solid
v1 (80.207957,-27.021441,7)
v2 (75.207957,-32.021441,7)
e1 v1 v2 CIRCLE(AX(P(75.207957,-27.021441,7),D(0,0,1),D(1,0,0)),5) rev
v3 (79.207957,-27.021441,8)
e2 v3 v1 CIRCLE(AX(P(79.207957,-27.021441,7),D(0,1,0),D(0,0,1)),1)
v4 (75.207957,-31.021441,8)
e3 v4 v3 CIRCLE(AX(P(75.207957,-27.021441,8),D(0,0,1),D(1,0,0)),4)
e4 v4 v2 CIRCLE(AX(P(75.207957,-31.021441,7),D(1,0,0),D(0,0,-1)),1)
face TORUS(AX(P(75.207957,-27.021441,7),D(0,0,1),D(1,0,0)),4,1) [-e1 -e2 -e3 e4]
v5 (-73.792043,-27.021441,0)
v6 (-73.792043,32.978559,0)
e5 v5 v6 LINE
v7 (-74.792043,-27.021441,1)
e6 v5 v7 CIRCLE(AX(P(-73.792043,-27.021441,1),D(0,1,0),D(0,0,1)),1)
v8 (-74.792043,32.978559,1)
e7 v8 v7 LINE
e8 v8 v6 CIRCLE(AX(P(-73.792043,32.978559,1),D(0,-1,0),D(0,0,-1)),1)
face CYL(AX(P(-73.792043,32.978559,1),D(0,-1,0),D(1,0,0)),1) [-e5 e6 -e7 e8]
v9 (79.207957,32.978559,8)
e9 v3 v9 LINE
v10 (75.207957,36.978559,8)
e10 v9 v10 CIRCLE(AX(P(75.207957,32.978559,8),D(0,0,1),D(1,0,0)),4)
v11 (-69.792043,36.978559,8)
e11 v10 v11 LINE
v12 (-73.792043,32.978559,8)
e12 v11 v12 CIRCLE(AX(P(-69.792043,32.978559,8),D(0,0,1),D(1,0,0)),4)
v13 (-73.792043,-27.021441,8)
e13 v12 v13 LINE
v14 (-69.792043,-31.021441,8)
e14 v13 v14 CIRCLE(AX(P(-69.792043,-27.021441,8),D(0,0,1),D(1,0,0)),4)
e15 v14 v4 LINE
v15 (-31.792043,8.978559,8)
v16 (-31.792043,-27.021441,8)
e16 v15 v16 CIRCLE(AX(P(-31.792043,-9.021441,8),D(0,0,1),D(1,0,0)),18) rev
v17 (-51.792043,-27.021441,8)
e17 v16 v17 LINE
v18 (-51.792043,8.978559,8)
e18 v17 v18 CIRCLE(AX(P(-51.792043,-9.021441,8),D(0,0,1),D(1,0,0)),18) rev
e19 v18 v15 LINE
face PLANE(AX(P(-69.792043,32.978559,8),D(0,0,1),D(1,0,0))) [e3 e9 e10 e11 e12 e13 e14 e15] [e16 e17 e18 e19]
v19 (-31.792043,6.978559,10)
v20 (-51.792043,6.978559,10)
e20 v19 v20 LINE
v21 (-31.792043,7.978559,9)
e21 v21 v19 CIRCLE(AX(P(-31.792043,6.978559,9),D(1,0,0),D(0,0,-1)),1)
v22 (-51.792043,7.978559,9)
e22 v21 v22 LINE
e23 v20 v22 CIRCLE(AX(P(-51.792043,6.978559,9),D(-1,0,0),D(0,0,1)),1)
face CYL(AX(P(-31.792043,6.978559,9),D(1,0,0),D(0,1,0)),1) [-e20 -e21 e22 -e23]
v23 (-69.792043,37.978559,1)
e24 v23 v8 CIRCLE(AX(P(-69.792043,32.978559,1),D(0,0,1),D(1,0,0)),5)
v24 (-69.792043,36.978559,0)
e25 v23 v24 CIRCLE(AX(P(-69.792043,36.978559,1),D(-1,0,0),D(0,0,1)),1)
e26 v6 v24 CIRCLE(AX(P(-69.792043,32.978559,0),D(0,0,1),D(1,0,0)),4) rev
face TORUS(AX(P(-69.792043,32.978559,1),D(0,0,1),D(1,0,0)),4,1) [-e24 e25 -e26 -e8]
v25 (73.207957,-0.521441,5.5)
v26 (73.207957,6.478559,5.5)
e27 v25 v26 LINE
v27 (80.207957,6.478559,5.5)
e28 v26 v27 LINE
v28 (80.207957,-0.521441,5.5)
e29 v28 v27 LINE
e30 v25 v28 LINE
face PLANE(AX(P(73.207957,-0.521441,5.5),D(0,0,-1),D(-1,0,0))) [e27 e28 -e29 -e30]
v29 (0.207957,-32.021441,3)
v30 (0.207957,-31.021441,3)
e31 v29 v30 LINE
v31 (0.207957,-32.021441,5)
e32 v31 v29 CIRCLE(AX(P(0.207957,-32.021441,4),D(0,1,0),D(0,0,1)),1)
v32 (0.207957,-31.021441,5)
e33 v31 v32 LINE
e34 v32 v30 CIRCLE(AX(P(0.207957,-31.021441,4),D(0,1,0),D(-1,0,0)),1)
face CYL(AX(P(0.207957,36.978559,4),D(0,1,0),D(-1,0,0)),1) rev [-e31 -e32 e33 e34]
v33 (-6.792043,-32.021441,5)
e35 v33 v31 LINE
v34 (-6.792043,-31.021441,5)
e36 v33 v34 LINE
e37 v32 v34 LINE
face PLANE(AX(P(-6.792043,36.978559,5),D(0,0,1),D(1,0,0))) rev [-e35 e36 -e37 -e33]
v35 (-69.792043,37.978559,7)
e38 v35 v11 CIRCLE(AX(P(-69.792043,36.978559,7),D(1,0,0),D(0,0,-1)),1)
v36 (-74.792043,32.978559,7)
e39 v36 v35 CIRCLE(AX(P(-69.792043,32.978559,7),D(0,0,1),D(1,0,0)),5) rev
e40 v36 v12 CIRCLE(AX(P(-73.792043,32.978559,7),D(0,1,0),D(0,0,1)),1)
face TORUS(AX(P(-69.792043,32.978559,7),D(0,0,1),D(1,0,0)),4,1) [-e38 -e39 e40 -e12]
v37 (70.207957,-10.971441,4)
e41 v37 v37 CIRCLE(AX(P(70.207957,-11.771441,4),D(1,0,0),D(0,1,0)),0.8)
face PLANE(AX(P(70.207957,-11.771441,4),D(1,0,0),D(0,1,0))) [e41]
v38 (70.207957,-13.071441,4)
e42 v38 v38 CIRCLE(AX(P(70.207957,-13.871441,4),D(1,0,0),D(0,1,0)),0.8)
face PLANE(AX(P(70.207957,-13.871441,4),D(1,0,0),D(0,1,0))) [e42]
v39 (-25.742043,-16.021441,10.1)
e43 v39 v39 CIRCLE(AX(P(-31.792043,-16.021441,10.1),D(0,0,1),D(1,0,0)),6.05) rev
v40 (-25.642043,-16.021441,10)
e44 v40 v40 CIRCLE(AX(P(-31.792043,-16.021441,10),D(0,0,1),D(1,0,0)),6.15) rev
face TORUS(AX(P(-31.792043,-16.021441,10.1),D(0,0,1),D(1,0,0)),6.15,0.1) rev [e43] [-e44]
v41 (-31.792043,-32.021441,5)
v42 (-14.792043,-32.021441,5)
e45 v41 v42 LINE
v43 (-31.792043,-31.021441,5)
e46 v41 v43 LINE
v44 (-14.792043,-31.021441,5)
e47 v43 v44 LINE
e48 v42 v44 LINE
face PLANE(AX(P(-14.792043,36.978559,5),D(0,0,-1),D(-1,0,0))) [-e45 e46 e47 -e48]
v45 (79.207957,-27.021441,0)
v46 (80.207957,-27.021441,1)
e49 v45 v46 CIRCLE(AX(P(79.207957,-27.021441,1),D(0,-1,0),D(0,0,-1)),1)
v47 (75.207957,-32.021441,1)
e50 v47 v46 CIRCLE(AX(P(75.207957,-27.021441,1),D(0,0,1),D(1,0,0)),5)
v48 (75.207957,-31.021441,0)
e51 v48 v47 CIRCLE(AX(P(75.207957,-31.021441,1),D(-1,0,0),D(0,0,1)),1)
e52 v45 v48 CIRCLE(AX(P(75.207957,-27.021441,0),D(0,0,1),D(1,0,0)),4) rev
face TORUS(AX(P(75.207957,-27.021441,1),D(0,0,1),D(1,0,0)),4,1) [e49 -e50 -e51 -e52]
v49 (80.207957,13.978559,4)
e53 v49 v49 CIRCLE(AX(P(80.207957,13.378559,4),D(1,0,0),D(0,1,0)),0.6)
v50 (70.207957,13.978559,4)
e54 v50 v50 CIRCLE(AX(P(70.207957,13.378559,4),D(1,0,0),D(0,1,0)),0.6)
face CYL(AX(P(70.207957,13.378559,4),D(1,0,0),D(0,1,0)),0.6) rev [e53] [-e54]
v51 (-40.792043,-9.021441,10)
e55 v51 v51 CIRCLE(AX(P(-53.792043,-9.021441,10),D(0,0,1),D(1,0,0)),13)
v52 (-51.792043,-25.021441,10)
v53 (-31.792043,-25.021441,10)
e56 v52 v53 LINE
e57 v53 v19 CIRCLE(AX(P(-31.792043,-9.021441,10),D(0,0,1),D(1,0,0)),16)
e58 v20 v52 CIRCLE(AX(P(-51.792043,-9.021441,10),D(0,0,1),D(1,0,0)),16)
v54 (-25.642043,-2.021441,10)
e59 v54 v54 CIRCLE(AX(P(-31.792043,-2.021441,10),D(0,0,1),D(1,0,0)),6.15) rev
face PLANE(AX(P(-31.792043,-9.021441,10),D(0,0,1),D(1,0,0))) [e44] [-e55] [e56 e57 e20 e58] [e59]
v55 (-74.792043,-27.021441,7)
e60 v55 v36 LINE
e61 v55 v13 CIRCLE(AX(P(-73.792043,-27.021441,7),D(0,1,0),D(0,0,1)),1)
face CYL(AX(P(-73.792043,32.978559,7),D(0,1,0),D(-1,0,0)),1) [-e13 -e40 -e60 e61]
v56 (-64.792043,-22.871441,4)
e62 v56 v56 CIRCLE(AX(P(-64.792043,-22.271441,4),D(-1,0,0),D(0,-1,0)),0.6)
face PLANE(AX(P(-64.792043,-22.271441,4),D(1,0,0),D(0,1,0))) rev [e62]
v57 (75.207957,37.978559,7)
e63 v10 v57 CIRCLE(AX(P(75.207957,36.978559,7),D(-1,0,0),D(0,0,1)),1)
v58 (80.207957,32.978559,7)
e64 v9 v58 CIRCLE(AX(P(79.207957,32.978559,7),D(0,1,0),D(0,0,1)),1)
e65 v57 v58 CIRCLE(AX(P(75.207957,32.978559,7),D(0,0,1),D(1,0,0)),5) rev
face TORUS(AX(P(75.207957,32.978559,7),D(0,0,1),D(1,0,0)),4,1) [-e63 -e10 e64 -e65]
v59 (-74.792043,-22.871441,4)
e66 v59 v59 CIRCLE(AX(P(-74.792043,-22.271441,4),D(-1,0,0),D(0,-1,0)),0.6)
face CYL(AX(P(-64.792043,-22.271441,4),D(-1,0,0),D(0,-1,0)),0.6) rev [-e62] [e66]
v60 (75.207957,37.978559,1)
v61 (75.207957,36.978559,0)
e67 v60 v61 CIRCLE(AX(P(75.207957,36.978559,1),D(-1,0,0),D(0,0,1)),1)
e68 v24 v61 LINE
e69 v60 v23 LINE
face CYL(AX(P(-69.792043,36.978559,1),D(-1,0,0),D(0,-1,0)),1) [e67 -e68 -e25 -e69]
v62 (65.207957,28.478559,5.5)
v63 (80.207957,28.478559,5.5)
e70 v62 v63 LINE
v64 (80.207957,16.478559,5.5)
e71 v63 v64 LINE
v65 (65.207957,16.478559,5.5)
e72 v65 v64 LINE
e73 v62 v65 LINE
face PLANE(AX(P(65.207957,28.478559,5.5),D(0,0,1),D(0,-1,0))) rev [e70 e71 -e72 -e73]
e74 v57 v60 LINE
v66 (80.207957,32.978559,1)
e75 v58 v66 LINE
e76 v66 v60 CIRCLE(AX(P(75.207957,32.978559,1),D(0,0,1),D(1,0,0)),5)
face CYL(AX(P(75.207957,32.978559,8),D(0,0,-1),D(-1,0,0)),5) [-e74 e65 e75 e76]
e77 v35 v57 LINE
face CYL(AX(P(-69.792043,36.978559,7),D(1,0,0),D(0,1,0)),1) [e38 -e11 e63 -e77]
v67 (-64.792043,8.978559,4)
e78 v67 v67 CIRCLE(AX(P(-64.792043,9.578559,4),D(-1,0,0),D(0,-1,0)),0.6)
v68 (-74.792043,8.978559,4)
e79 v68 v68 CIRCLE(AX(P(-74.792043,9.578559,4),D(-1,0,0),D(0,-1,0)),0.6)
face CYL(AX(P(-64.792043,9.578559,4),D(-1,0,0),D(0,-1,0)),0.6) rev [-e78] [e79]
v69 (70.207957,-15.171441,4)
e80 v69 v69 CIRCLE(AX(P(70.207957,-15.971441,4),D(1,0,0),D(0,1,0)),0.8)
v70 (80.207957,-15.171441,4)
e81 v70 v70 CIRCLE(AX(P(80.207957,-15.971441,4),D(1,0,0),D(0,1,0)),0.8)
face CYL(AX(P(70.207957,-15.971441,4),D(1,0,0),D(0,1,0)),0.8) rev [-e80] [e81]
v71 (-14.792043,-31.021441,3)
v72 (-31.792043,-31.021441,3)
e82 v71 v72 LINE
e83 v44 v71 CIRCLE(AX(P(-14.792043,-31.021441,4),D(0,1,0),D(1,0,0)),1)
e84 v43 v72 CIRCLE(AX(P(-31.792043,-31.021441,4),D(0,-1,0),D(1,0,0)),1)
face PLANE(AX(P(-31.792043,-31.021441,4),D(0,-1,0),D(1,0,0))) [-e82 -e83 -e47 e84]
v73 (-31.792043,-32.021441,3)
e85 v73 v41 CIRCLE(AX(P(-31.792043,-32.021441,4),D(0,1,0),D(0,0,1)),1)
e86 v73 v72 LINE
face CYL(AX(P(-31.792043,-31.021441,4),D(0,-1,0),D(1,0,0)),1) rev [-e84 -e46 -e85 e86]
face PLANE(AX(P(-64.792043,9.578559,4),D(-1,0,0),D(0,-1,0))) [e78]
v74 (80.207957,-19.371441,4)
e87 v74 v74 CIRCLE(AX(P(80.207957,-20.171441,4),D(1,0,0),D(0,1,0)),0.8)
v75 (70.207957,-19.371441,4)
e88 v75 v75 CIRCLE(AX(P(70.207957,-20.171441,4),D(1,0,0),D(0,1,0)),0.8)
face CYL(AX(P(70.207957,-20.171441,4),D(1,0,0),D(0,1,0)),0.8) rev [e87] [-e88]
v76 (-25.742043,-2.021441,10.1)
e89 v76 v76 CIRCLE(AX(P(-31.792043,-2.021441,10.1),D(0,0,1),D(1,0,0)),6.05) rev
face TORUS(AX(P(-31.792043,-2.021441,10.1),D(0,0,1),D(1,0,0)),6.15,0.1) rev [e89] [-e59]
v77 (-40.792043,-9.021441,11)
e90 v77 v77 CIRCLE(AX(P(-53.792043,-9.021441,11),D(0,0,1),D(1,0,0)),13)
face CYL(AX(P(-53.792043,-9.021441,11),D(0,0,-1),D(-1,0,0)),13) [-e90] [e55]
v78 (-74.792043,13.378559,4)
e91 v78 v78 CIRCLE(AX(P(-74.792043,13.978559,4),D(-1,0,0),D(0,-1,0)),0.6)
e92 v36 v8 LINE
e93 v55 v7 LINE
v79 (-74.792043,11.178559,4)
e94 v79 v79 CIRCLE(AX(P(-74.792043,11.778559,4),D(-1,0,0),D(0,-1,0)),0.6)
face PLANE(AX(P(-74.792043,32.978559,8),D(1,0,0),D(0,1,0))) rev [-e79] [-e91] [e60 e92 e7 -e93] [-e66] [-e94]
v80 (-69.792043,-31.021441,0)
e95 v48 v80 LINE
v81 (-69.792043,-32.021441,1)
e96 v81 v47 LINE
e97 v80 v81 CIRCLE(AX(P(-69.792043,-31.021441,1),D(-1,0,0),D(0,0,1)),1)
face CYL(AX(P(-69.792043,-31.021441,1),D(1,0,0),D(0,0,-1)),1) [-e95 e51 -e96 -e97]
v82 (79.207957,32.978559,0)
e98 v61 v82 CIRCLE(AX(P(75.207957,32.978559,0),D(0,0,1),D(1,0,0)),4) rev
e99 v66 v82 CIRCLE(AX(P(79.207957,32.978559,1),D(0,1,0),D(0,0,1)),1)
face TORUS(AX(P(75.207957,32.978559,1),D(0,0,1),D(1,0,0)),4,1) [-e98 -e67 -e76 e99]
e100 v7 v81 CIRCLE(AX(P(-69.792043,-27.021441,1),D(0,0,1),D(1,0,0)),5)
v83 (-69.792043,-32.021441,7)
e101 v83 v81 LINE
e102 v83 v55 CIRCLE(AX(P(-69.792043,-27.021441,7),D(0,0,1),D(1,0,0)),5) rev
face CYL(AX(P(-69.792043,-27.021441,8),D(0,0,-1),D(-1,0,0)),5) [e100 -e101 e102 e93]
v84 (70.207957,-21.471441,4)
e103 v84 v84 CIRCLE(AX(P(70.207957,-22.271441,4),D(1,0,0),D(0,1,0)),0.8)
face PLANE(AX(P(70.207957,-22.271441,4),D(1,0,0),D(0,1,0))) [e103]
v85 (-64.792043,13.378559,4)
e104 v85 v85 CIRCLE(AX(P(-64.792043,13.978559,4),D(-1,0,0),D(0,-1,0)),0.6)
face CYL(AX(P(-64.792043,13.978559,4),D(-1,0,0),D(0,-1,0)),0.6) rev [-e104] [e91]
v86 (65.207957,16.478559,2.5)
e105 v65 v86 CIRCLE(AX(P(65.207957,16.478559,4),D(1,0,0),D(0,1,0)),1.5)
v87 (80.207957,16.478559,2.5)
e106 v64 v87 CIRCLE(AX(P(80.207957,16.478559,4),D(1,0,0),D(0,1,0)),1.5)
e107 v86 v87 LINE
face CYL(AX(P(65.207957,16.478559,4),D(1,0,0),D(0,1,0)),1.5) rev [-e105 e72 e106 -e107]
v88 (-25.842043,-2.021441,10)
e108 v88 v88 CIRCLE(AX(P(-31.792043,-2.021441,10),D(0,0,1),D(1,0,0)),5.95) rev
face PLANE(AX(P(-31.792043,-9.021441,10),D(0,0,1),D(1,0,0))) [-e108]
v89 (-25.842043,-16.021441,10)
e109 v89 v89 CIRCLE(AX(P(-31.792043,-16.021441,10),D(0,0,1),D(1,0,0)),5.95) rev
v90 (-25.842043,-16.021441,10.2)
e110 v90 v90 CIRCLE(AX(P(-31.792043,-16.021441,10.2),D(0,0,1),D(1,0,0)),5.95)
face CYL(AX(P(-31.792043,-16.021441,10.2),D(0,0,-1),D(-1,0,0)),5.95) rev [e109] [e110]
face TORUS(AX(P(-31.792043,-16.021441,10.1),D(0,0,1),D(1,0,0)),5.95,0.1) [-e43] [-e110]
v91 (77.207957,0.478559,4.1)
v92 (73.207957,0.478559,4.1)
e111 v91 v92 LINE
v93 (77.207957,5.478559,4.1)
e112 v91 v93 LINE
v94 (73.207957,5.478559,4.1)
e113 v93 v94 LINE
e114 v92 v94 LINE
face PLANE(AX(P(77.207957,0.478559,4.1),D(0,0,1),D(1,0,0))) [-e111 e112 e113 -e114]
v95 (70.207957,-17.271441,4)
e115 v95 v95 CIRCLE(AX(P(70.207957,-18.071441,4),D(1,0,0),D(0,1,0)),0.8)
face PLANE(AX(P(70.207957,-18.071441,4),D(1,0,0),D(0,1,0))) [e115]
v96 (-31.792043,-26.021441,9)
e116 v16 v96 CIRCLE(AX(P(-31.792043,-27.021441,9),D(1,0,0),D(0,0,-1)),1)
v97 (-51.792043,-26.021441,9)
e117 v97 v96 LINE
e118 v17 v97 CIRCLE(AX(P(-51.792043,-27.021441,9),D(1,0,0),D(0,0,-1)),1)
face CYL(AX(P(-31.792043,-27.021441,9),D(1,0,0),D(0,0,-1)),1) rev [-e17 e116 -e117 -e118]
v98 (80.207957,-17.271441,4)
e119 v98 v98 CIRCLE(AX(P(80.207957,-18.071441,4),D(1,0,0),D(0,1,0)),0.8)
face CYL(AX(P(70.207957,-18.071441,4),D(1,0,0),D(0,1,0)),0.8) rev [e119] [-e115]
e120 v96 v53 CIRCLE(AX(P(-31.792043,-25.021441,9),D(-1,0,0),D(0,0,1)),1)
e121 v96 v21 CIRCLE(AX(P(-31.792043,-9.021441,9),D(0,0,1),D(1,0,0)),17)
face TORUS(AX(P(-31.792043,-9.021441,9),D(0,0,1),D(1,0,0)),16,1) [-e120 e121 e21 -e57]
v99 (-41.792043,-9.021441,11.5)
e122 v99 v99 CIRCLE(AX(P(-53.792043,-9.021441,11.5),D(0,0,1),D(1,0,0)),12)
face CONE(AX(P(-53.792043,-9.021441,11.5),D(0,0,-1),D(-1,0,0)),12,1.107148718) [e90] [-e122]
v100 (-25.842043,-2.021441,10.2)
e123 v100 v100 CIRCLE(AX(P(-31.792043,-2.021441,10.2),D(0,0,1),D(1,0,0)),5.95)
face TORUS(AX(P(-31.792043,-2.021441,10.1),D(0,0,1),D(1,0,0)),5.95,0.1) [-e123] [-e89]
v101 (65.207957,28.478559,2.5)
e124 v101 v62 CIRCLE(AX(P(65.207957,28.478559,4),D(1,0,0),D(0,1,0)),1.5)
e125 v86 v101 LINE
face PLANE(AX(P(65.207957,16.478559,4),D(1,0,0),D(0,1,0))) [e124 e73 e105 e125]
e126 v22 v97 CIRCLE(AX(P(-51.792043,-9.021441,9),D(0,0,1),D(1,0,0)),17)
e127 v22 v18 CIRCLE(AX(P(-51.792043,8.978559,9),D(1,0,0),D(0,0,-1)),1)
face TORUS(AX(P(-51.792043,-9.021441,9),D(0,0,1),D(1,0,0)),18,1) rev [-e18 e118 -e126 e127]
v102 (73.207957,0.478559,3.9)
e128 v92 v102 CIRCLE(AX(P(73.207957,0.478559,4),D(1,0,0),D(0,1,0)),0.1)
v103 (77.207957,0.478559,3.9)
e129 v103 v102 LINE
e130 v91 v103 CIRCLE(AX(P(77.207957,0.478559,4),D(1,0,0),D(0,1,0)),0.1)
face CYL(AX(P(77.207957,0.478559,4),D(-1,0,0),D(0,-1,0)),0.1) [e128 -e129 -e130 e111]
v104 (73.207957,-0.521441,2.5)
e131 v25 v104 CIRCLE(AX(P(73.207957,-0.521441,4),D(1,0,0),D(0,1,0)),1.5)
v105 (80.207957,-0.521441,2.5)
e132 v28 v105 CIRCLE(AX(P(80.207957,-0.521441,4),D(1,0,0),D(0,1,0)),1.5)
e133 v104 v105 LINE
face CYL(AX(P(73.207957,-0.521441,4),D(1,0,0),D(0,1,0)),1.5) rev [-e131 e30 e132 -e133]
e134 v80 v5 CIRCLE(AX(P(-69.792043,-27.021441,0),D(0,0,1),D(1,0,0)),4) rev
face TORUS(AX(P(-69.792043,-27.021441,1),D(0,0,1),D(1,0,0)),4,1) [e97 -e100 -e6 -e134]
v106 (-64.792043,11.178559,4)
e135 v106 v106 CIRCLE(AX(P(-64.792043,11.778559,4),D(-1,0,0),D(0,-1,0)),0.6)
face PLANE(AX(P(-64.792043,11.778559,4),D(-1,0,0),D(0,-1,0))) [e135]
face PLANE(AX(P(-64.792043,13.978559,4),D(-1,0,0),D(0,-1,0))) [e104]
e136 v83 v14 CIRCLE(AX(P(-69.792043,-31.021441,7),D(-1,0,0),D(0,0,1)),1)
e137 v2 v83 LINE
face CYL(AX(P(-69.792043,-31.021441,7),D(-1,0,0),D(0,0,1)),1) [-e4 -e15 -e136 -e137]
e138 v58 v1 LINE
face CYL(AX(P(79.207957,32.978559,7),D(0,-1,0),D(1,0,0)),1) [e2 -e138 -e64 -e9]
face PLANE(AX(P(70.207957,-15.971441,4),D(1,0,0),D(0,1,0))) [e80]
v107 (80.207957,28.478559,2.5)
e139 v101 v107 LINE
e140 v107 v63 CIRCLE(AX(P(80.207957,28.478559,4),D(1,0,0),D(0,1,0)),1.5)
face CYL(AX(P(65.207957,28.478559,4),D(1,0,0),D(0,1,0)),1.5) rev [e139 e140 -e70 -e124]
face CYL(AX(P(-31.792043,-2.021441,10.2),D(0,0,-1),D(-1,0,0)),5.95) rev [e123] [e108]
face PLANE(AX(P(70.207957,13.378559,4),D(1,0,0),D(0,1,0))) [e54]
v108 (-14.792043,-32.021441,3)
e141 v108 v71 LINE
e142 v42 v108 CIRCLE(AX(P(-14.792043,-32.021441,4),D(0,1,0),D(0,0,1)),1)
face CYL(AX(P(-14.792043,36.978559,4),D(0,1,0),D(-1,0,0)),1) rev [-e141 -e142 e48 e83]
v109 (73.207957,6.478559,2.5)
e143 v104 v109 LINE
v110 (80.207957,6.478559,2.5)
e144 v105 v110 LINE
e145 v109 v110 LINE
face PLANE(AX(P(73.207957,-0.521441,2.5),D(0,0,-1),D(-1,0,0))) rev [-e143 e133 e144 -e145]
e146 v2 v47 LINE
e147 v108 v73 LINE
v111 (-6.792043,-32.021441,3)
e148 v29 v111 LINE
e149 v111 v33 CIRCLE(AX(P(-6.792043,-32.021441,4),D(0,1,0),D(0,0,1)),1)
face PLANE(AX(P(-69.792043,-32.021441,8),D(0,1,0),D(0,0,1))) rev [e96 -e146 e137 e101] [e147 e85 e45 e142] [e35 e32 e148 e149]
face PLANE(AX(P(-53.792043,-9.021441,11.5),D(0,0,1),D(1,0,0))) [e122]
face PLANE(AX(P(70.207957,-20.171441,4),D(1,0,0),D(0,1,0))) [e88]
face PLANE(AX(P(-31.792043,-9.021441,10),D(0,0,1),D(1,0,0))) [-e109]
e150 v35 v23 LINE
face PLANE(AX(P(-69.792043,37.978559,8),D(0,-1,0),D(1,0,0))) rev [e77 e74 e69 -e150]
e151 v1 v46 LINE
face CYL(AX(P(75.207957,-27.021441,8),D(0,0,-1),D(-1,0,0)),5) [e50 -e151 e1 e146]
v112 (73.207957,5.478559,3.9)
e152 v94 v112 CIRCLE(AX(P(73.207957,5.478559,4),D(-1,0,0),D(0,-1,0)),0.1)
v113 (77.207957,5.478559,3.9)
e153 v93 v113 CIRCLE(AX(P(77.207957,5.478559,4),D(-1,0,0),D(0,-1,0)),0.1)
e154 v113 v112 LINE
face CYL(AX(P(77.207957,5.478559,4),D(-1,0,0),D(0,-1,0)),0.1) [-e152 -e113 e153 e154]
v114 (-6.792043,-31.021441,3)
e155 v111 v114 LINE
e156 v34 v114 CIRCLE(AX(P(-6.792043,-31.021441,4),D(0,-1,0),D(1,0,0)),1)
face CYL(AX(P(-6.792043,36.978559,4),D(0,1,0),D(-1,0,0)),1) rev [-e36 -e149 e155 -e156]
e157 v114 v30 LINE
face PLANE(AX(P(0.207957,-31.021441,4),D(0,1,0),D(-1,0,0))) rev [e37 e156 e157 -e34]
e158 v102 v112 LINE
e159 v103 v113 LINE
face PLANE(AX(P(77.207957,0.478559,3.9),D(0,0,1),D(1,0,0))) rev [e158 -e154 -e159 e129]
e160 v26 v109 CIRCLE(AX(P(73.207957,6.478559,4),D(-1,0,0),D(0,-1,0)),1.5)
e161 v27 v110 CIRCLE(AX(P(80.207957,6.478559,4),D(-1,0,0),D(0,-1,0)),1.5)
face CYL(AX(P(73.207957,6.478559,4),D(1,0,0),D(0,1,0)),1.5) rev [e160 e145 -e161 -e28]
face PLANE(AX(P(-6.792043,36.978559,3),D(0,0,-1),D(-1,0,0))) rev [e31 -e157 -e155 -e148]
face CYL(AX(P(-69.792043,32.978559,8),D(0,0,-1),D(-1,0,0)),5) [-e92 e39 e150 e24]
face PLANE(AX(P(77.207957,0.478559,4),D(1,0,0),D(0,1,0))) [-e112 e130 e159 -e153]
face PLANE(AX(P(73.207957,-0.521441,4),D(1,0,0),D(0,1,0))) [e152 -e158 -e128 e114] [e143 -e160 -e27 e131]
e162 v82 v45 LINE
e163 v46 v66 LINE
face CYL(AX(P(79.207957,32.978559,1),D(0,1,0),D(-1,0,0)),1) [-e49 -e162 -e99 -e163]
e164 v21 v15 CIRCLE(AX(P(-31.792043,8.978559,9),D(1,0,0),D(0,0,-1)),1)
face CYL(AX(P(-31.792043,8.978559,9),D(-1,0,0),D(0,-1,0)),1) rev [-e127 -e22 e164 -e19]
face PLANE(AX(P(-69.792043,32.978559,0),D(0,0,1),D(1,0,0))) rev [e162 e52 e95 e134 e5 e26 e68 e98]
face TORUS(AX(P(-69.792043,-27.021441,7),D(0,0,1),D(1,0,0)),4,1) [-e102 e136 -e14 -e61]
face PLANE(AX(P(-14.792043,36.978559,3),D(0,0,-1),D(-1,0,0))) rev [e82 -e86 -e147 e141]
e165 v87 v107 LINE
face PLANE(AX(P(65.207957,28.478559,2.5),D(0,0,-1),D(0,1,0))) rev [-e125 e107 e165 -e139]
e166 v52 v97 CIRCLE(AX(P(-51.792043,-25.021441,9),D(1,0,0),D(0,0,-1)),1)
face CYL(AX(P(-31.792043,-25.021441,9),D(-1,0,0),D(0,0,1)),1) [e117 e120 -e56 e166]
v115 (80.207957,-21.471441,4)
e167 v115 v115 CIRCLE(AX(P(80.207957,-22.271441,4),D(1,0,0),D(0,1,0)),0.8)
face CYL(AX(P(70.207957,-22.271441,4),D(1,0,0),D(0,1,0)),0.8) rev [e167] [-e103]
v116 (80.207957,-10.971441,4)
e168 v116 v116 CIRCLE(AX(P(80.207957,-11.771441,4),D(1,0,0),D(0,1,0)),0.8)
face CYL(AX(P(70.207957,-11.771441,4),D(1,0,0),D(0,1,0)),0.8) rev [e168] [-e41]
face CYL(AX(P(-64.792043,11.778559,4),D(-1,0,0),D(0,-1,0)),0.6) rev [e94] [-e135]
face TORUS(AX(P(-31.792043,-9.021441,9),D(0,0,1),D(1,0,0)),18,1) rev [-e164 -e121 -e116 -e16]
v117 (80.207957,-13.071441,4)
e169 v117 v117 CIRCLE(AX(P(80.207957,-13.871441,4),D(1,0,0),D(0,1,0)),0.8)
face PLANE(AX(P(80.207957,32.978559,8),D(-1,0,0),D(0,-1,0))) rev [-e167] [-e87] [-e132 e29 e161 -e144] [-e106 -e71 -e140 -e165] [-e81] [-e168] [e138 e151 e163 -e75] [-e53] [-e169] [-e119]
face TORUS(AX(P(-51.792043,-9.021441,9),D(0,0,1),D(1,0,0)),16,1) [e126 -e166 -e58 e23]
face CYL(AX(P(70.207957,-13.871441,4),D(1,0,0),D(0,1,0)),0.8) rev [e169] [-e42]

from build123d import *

# Parameters (mm, degrees)
EXTRUDE_1_DEPTH      = 8
FILLET_1_R           = 1
FILLET_2_R           = 1
CUT_EXTRUDE_2_DEPTH  = 7
EXTRUDE_3_DEPTH      = 4
CUT_EXTRUDE_3_DEPTH  = 15
SKETCH_8_R           = 0.6
CUT_EXTRUDE_5_DEPTH  = 10
SKETCH_10_R          = 0.95
CUT_EXTRUDE_6_DEPTH  = 10
SKETCH_11_R          = 0.85
CUT_EXTRUDE_7_DEPTH  = 10
SKETCH_12_R          = 0.95
SKETCH_12_R_2        = 0.9
EXTRUDE_4_DEPTH      = 10
EXTRUDE_START        = 10
SKETCH_13_R          = 0.85
EXTRUDE_5_DEPTH      = 10
SKETCH_14_R          = 0.9
CUT_EXTRUDE_8_DEPTH  = 10
SKETCH_15_R          = 0.9
SKETCH_15_R_2        = 0.8
EXTRUDE_6_DEPTH      = 10
SKETCH_16_R          = 0.9
SKETCH_16_R_2        = 0.8
EXTRUDE_7_DEPTH      = 10
SKETCH_17_R          = 0.8
EXTRUDE_8_DEPTH      = 10
SKETCH_18_R          = 0.8
EXTRUDE_9_DEPTH      = 10
SKETCH_19_R          = 0.8
CUT_EXTRUDE_9_DEPTH  = 10
SKETCH_20_R          = 0.8
CUT_EXTRUDE_10_DEPTH = 10
SKETCH_21_R          = 0.8
CUT_EXTRUDE_11_DEPTH = 10
SKETCH_22_R          = 0.8
CUT_EXTRUDE_12_DEPTH = 10
SKETCH_23_R          = 0.8
CUT_EXTRUDE_13_DEPTH = 10
SKETCH_24_R          = 0.8
CUT_EXTRUDE_14_DEPTH = 10
CUT_EXTRUDE_15_DEPTH = 1
CUT_EXTRUDE_16_DEPTH = 1
CUT_EXTRUDE_17_DEPTH = 128
CUT_EXTRUDE_18_DEPTH = 128
EXTRUDE_10_DEPTH     = 69
EXTRUDE_12_DEPTH     = 69
SKETCH_34_R          = 0.8
CUT_EXTRUDE_19_DEPTH = 190
EXTRUDE_START_2      = -10
SKETCH_37_R          = 0.8
SKETCH_37_R_2        = 0.6
EXTRUDE_13_DEPTH     = 10
EXTRUDE_START_3      = 135
SKETCH_39_R          = 0.8
EXTRUDE_14_DEPTH     = 135
SKETCH_40_R          = 0.6
CUT_EXTRUDE_20_DEPTH = 155
SKETCH_43_R          = 0.6
EXTRUDE_15_DEPTH     = 145
SKETCH_44_R          = 0.6
CUT_EXTRUDE_21_DEPTH = 10
SKETCH_45_R          = 0.6
CUT_EXTRUDE_22_DEPTH = 10
SKETCH_47_R          = 1
EXTRUDE_16_DEPTH     = 10
CUT_EXTRUDE_START    = -10
SKETCH_49_R          = 1
CUT_EXTRUDE_23_DEPTH = 10
SKETCH_50_R          = 1
EXTRUDE_17_DEPTH     = 10
EXTRUDE_18_DEPTH     = 2
FILLET_3_R           = 1
FILLET_4_R           = 1
SKETCH_54_R          = 13
EXTRUDE_19_DEPTH     = 1
SKETCH_55_R          = 12
EXTRUDE_20_DEPTH     = 0.5
SKETCH_56_R          = 1
CUT_EXTRUDE_24_DEPTH = 10
SKETCH_57_R          = 6.05
SKETCH_57_R_2        = 5.95
EXTRUDE_21_DEPTH     = 0.2
FILLET_6_R           = 0.1
SKETCH_58_R          = 6.05
SKETCH_58_R_2        = 5.95
EXTRUDE_22_DEPTH     = 0.2
FILLET_9_R           = 0.1
SKETCH_61_R          = 0.6
EXTRUDE_23_DEPTH     = 10
SKETCH_62_R          = 0.6
EXTRUDE_24_DEPTH     = 10
EXTRUDE_START_4      = -20
SKETCH_65_R          = 0.6
EXTRUDE_28_DEPTH     = 20
SKETCH_67_R          = 0.6
CUT_EXTRUDE_26_DEPTH = 10
SKETCH_68_R          = 0.6
CUT_EXTRUDE_27_DEPTH = 10
SKETCH_69_R          = 0.6
CUT_EXTRUDE_28_DEPTH = 10


with BuildPart() as part:
    # 草图1 → 凸台-拉伸1 (new body)
    with BuildSketch(Plane.XY):
        with BuildLine():
            Line((-74.7920434, 32.978558835), (-74.7920434, -27.021441165))
            ThreePointArc((-74.7920434, -27.021441165), (-73.327577306, -30.556975071), (-69.7920434, -32.021441165))
            Line((-69.7920434, -32.021441165), (75.2079566, -32.021441165))
            ThreePointArc((75.2079566, -32.021441165), (78.743490506, -30.556975071), (80.2079566, -27.021441165))
            Line((80.2079566, -27.021441165), (80.2079566, 32.978558835))
            ThreePointArc((80.2079566, 32.978558835), (78.743490506, 36.514092741), (75.2079566, 37.978558835))
            Line((75.2079566, 37.978558835), (-69.7920434, 37.978558835))
            ThreePointArc((-69.7920434, 37.978558835), (-73.327577306, 36.514092741), (-74.7920434, 32.978558835))
        make_face()
    extrude(amount=EXTRUDE_1_DEPTH)

    # 圆角1
    fillet_1_edges = [part.edges().sort_by_distance(p)[0] for p in [
        (-73.327577306, -30.556975071, 8),
        (2.7079566, -32.021441165, 8),
        (78.743490506, -30.556975071, 8),
        (80.2079566, 2.978558835, 8),
        (78.743490506, 36.514092741, 8),
        (2.7079566, 37.978558835, 8),
        (-73.327577306, 36.514092741, 8),
        (-74.7920434, 2.978558835, 8),
    ]]
    fillet(fillet_1_edges, radius=FILLET_1_R)

    # 圆角2
    fillet_2_edges = [part.edges().sort_by_distance(p)[0] for p in [
        (2.7079566, -32.021441165, 0),
        (-73.327577306, -30.556975071, 0),
        (-74.7920434, 2.978558835, 0),
        (-73.327577306, 36.514092741, 0),
        (2.7079566, 37.978558835, 0),
        (78.743490506, 36.514092741, 0),
        (80.2079566, 2.978558835, 0),
        (78.743490506, -30.556975071, 0),
    ]]
    fillet(fillet_2_edges, radius=FILLET_2_R)

    # 草图3 → 切除-拉伸2 (cut)
    with BuildSketch(Plane(origin=(80.2079566, 0, 0), x_dir=(0, 0, -1), z_dir=(1, 0, 0))):
        with BuildLine():
            Line((-5.5, -0.521441165), (-5.5, 6.478558835))
            ThreePointArc((-5.5, 6.478558835), (-4, 7.978558835), (-2.5, 6.478558835))
            Line((-2.5, 6.478558835), (-2.5, -0.521441165))
            ThreePointArc((-2.5, -0.521441165), (-4, -2.021441165), (-5.5, -0.521441165))
        make_face()
    extrude(amount=-CUT_EXTRUDE_2_DEPTH, mode=Mode.SUBTRACT)

    # 草图6 → 凸台-拉伸3 (add)
    with BuildSketch(Plane(origin=(73.2079566, 0, 0), x_dir=(0, 0, -1), z_dir=(1, 0, 0))):
        with BuildLine():
            Line((-4.1, 0.478558835), (-4.1, 5.478558835))
            ThreePointArc((-4.1, 5.478558835), (-4, 5.578558835), (-3.9, 5.478558835))
            Line((-3.9, 5.478558835), (-3.9, 0.478558835))
            ThreePointArc((-3.9, 0.478558835), (-4, 0.378558835), (-4.1, 0.478558835))
        make_face()
    extrude(amount=EXTRUDE_3_DEPTH)

    # 草图7 → 切除-拉伸3 (cut)
    with BuildSketch(Plane(origin=(80.2079566, 0, 0), x_dir=(0, 0, -1), z_dir=(1, 0, 0))):
        with BuildLine():
            Line((-5.5, 28.478558835), (-5.5, 16.478558835))
            ThreePointArc((-5.5, 16.478558835), (-4, 14.978558835), (-2.5, 16.478558835))
            Line((-2.5, 16.478558835), (-2.5, 28.478558835))
            ThreePointArc((-2.5, 28.478558835), (-4, 29.978558835), (-5.5, 28.478558835))
        make_face()
    extrude(amount=-CUT_EXTRUDE_3_DEPTH, mode=Mode.SUBTRACT)

    # 草图8 → 切除-拉伸5 (cut)
    with BuildSketch(Plane(origin=(80.2079566, 0, 0), x_dir=(0, 0, -1), z_dir=(1, 0, 0))):
        with Locations(Location((-4, 13.378558835, 0), (0, 0, 90))):
            Circle(SKETCH_8_R)
    extrude(amount=-CUT_EXTRUDE_5_DEPTH, mode=Mode.SUBTRACT)

    # 草图10 → 切除-拉伸6 (cut)
    with BuildSketch(Plane(origin=(80.2079566, 0, 0), x_dir=(0, 0, -1), z_dir=(1, 0, 0))):
        with Locations(Location((-4, -11.971441165, 0), (0, 0, 90))):
            Circle(SKETCH_10_R)
    extrude(amount=-CUT_EXTRUDE_6_DEPTH, mode=Mode.SUBTRACT)

    # 草图11 → 切除-拉伸7 (cut)
    with BuildSketch(Plane(origin=(80.2079566, 0, 0), x_dir=(0, 0, -1), z_dir=(1, 0, 0))):
        with Locations(Location((-4, -13.891441165, 0), (0, 0, 90))):
            Circle(SKETCH_11_R)
    extrude(amount=-CUT_EXTRUDE_7_DEPTH, mode=Mode.SUBTRACT)

    # 草图12 → 凸台-拉伸4 (add)
    with BuildSketch(Plane(origin=(80.2079566, 0, 0), x_dir=(0, 0, -1), z_dir=(1, 0, 0))):
        with Locations((-4, -11.971441165)):
            Circle(SKETCH_12_R)
        with Locations(Location((-4, -11.971441165, 0), (0, 0, 90))):
            Circle(SKETCH_12_R_2, mode=Mode.SUBTRACT)
    extrude(amount=-EXTRUDE_4_DEPTH)

    # 草图13 → 凸台-拉伸5 (add)
    with BuildSketch(Plane(origin=(70.2079566, 0, 0), x_dir=(0, 0, -1), z_dir=(1, 0, 0)).offset(EXTRUDE_START)):
        with Locations((-4, -13.891441165)):
            Circle(SKETCH_13_R)
    extrude(amount=-EXTRUDE_5_DEPTH)

    # 草图14 → 切除-拉伸8 (cut)
    with BuildSketch(Plane(origin=(80.2079566, 0, 0), x_dir=(0, 0, -1), z_dir=(1, 0, 0))):
        with Locations(Location((-4, -13.991441165, 0), (0, 0, 90))):
            Circle(SKETCH_14_R)
    extrude(amount=-CUT_EXTRUDE_8_DEPTH, mode=Mode.SUBTRACT)

    # 草图15 → 凸台-拉伸6 (add)
    with BuildSketch(Plane(origin=(80.2079566, 0, 0), x_dir=(0, 0, -1), z_dir=(1, 0, 0))):
        with Locations((-4, -11.971441165)):
            Circle(SKETCH_15_R)
        with Locations(Location((-4, -11.971441165, 0), (0, 0, 90))):
            Circle(SKETCH_15_R_2, mode=Mode.SUBTRACT)
    extrude(amount=-EXTRUDE_6_DEPTH)

    # 草图16 → 凸台-拉伸7 (add)
    with BuildSketch(Plane(origin=(70.2079566, 0, 0), x_dir=(0, 0, -1), z_dir=(1, 0, 0)).offset(EXTRUDE_START)):
        with Locations((-4, -13.991441165)):
            Circle(SKETCH_16_R)
        with Locations(Location((-4, -13.991441165, 0), (0, 0, 90))):
            Circle(SKETCH_16_R_2, mode=Mode.SUBTRACT)
    extrude(amount=-EXTRUDE_7_DEPTH)

    # 草图17 → 凸台-拉伸8 (add)
    with BuildSketch(Plane(origin=(70.2079566, 0, 0), x_dir=(0, 0, -1), z_dir=(1, 0, 0)).offset(EXTRUDE_START)):
        with Locations((-4, -11.971441165)):
            Circle(SKETCH_17_R)
    extrude(amount=-EXTRUDE_8_DEPTH)

    # 草图18 → 凸台-拉伸9 (add)
    with BuildSketch(Plane(origin=(70.2079566, 0, 0), x_dir=(0, 0, -1), z_dir=(1, 0, 0)).offset(EXTRUDE_START)):
        with Locations((-4, -13.991441165)):
            Circle(SKETCH_18_R)
    extrude(amount=-EXTRUDE_9_DEPTH)

    # 草图19 → 切除-拉伸9 (cut)
    with BuildSketch(Plane(origin=(80.2079566, 0, 0), x_dir=(0, 0, -1), z_dir=(1, 0, 0))):
        with Locations(Location((-4, -11.771441165, 0), (0, 0, 90))):
            Circle(SKETCH_19_R)
    extrude(amount=-CUT_EXTRUDE_9_DEPTH, mode=Mode.SUBTRACT)

    # 草图20 → 切除-拉伸10 (cut)
    with BuildSketch(Plane(origin=(80.2079566, 0, 0), x_dir=(0, 0, -1), z_dir=(1, 0, 0))):
        with Locations(Location((-4, -13.871441165, 0), (0, 0, 90))):
            Circle(SKETCH_20_R)
    extrude(amount=-CUT_EXTRUDE_10_DEPTH, mode=Mode.SUBTRACT)

    # 草图21 → 切除-拉伸11 (cut)
    with BuildSketch(Plane(origin=(80.2079566, 0, 0), x_dir=(0, 0, -1), z_dir=(1, 0, 0))):
        with Locations(Location((-4, -15.971441165, 0), (0, 0, 90))):
            Circle(SKETCH_21_R)
    extrude(amount=-CUT_EXTRUDE_11_DEPTH, mode=Mode.SUBTRACT)

    # 草图22 → 切除-拉伸12 (cut)
    with BuildSketch(Plane(origin=(80.2079566, 0, 0), x_dir=(0, 0, -1), z_dir=(1, 0, 0))):
        with Locations(Location((-4, -18.071441165, 0), (0, 0, 90))):
            Circle(SKETCH_22_R)
    extrude(amount=-CUT_EXTRUDE_12_DEPTH, mode=Mode.SUBTRACT)

    # 草图23 → 切除-拉伸13 (cut)
    with BuildSketch(Plane(origin=(80.2079566, 0, 0), x_dir=(0, 0, -1), z_dir=(1, 0, 0))):
        with Locations(Location((-4, -20.171441165, 0), (0, 0, 90))):
            Circle(SKETCH_23_R)
    extrude(amount=-CUT_EXTRUDE_13_DEPTH, mode=Mode.SUBTRACT)

    # 草图24 → 切除-拉伸14 (cut)
    with BuildSketch(Plane(origin=(80.2079566, 0, 0), x_dir=(0, 0, -1), z_dir=(1, 0, 0))):
        with Locations(Location((-4, -22.271441165, 0), (0, 0, 90))):
            Circle(SKETCH_24_R)
    extrude(amount=-CUT_EXTRUDE_14_DEPTH, mode=Mode.SUBTRACT)

    # 草图25 → 切除-拉伸15 (cut)
    with BuildSketch(Plane(origin=(0, 37.978558835, 0), x_dir=(1, 0, 0), z_dir=(0, 1, 0))):
        with BuildLine():
            Line((-14.7920434, -5), (-31.7920434, -5))
            ThreePointArc((-31.7920434, -5), (-32.7920434, -4), (-31.7920434, -3))
            Line((-31.7920434, -3), (-14.7920434, -3))
            ThreePointArc((-14.7920434, -3), (-13.7920434, -4), (-14.7920434, -5))
        make_face()
    extrude(amount=-CUT_EXTRUDE_15_DEPTH, mode=Mode.SUBTRACT)

    # 草图26 → 切除-拉伸16 (cut)
    with BuildSketch(Plane(origin=(0, 37.978558835, 0), x_dir=(1, 0, 0), z_dir=(0, 1, 0))):
        with BuildLine():
            Line((-6.7920434, -5), (0.2079566, -5))
            ThreePointArc((0.2079566, -5), (1.2079566, -4), (0.2079566, -3))
            Line((0.2079566, -3), (-6.7920434, -3))
            ThreePointArc((-6.7920434, -3), (-7.7920434, -4), (-6.7920434, -5))
        make_face()
    extrude(amount=-CUT_EXTRUDE_16_DEPTH, mode=Mode.SUBTRACT)

    # 草图28 → 切除-拉伸17 (cut)
    with BuildSketch(Plane(origin=(0, 37.978558835, 0), x_dir=(1, 0, 0), z_dir=(0, 1, 0))):
        with BuildLine():
            Line((-31.7920434, -3), (-14.7920434, -3))
            ThreePointArc((-14.7920434, -3), (-13.7920434, -4), (-14.7920434, -5))
            Line((-14.7920434, -5), (-31.7920434, -5))
            ThreePointArc((-31.7920434, -5), (-32.7920434, -4), (-31.7920434, -3))
        make_face()
    extrude(amount=-CUT_EXTRUDE_17_DEPTH, mode=Mode.SUBTRACT)

    # 草图30 → 切除-拉伸18 (cut)
    with BuildSketch(Plane(origin=(0, 37.978558835, 0), x_dir=(1, 0, 0), z_dir=(0, 1, 0))):
        with BuildLine():
            Line((-6.7920434, -3), (0.2079566, -3))
            ThreePointArc((0.2079566, -3), (1.2079566, -4), (0.2079566, -5))
            Line((0.2079566, -5), (-6.7920434, -5))
            ThreePointArc((-6.7920434, -5), (-7.7920434, -4), (-6.7920434, -3))
        make_face()
    extrude(amount=-CUT_EXTRUDE_18_DEPTH, mode=Mode.SUBTRACT)

    # 草图32 → 凸台-拉伸10 (add)
    with BuildSketch(Plane(origin=(0, 37.978558835, 0), x_dir=(1, 0, 0), z_dir=(0, 1, 0))):
        with BuildLine():
            Line((-31.7920434, -3), (-14.7920434, -3))
            ThreePointArc((-14.7920434, -3), (-13.7920434, -4), (-14.7920434, -5))
            Line((-14.7920434, -5), (-31.7920434, -5))
            ThreePointArc((-31.7920434, -5), (-32.7920434, -4), (-31.7920434, -3))
        make_face()
    extrude(amount=-EXTRUDE_10_DEPTH)

    # 草图33 → 凸台-拉伸12 (add)
    with BuildSketch(Plane(origin=(0, 37.978558835, 0), x_dir=(1, 0, 0), z_dir=(0, 1, 0))):
        with BuildLine():
            Line((-6.7920434, -3), (0.2079566, -3))
            ThreePointArc((0.2079566, -3), (1.2079566, -4), (0.2079566, -5))
            Line((0.2079566, -5), (-6.7920434, -5))
            ThreePointArc((-6.7920434, -5), (-7.7920434, -4), (-6.7920434, -3))
        make_face()
    extrude(amount=-EXTRUDE_12_DEPTH)

    # 草图34 → 切除-拉伸19 (cut)
    with BuildSketch(Plane(origin=(80.2079566, 0, 0), x_dir=(0, 0, -1), z_dir=(1, 0, 0))):
        with Locations(Location((-4, -22.271441165, 0), (0, 0, 90))):
            Circle(SKETCH_34_R)
    extrude(amount=-CUT_EXTRUDE_19_DEPTH, mode=Mode.SUBTRACT)

    # 草图37 → 凸台-拉伸13 (add)
    with BuildSketch(Plane.ZY.offset(74.7920434).offset(EXTRUDE_START_2)):
        with Locations(Location((4, -22.271441165, 0), (0, 0, 90))):
            Circle(SKETCH_37_R)
        with Locations(Location((4, -22.271441165, 0), (0, 0, 270))):
            Circle(SKETCH_37_R_2, mode=Mode.SUBTRACT)
    extrude(amount=EXTRUDE_13_DEPTH)

    # 草图39 → 凸台-拉伸14 (add)
    with BuildSketch(Plane(origin=(-64.7920434, 0, 0), x_dir=(0, 0, -1), z_dir=(1, 0, 0)).offset(EXTRUDE_START_3)):
        with Locations(Location((-4, -22.271441165, 0), (0, 0, 90))):
            Circle(SKETCH_39_R)
    extrude(amount=-EXTRUDE_14_DEPTH)

    # 草图40 → 切除-拉伸20 (cut)
    with BuildSketch(Plane(origin=(73.2079566, 0, 0), x_dir=(0, 0, -1), z_dir=(1, 0, 0))):
        with Locations(Location((-4, 0.478558835, 0), (0, 0, 90))):
            Circle(SKETCH_40_R)
    extrude(amount=-CUT_EXTRUDE_20_DEPTH, mode=Mode.SUBTRACT)

    # 草图43 → 凸台-拉伸15 (add)
    with BuildSketch(Plane.ZY.offset(-73.2079566)):
        with Locations(Location((4, 0.478558835, 0), (0, 0, 90))):
            Circle(SKETCH_43_R)
    extrude(amount=EXTRUDE_15_DEPTH)

    # 草图44 → 切除-拉伸21 (cut)
    with BuildSketch(Plane.ZY.offset(74.7920434)):
        with Locations(Location((4, 2.678558835, 0), (0, 0, 270))):
            Circle(SKETCH_44_R)
    extrude(amount=-CUT_EXTRUDE_21_DEPTH, mode=Mode.SUBTRACT)

    # 草图45 → 切除-拉伸22 (cut)
    with BuildSketch(Plane.ZY.offset(74.7920434)):
        with Locations(Location((4, 4.878558835, 0), (0, 0, 270))):
            Circle(SKETCH_45_R)
    extrude(amount=-CUT_EXTRUDE_22_DEPTH, mode=Mode.SUBTRACT)

    # 草图50 → 凸台-拉伸17 (add)
    with BuildSketch(Plane.XZ.offset(31.021441165)):
        with Locations(Location((-31.7920434, 4, 0), (0, 0, 90))):
            Circle(SKETCH_50_R)
    extrude(amount=EXTRUDE_17_DEPTH)

    # 草图53 → 凸台-拉伸18 (add)
    with BuildSketch(Plane.XY.offset(8)):
        with BuildLine():
            Line((-31.7920434, -26.021441165), (-51.7920434, -26.021441165))
            ThreePointArc((-51.7920434, -26.021441165), (-68.7920434, -9.021441165), (-51.7920434, 7.978558835))
            Line((-51.7920434, 7.978558835), (-31.7920434, 7.978558835))
            ThreePointArc((-31.7920434, 7.978558835), (-14.7920434, -9.021441165), (-31.7920434, -26.021441165))
        make_face()
    extrude(amount=EXTRUDE_18_DEPTH)

    # 圆角3
    fillet_3_edges = [part.edges().sort_by_distance(p)[0] for p in [
        (-14.7920434, -9.021441165, 8),
        (-41.7920434, 7.978558835, 8),
        (-68.7920434, -9.021441165, 8),
        (-41.7920434, -26.021441165, 8),
    ]]
    fillet(fillet_3_edges, radius=FILLET_3_R)

    # 圆角4
    fillet_4_edges = [part.edges().sort_by_distance(p)[0] for p in [
        (-41.7920434, -26.021441165, 10),
        (-68.7920434, -9.021441165, 10),
        (-41.7920434, 7.978558835, 10),
        (-14.7920434, -9.021441165, 10),
    ]]
    fillet(fillet_4_edges, radius=FILLET_4_R - 0.0001)  # a hair under: the kernel refuses the full size

    # 草图54 → 凸台-拉伸19 (add)
    with BuildSketch(Plane.XY.offset(10)):
        with Locations((-53.7920434, -9.021441165)):
            Circle(SKETCH_54_R)
    extrude(amount=EXTRUDE_19_DEPTH)

    # 草图55 → 凸台-拉伸20 (add)
    with BuildSketch(Plane.XY.offset(11)):
        with Locations((-53.7920434, -9.021441165)):
            Circle(SKETCH_55_R)
    extrude(amount=EXTRUDE_20_DEPTH)

    # loft up to a face of the part (loft_1)
    loft([Face(Wire([part.edges().sort_by_distance((-62.006608671, -0.273817636, 11.5))[0]])), Face(Wire([part.edges().sort_by_distance((-62.691155777, 0.455150992, 11))[0]]))])

    # 草图56 → 切除-拉伸24 (cut)
    with BuildSketch(Plane.XZ.offset(41.021441165).offset(CUT_EXTRUDE_START)):
        with Locations((-31.7920434, 4)):
            Circle(SKETCH_56_R)
    extrude(amount=CUT_EXTRUDE_24_DEPTH, mode=Mode.SUBTRACT)

    # 草图57 → 凸台-拉伸21 (add)
    with BuildSketch(Plane.XY.offset(10)):
        with Locations((-31.7920434, -16.021441165)):
            Circle(SKETCH_57_R)
        with Locations((-31.7920434, -16.021441165)):
            Circle(SKETCH_57_R_2, mode=Mode.SUBTRACT)
    extrude(amount=EXTRUDE_21_DEPTH)

    # 圆角6
    fillet_6_edges = [part.edges().sort_by_distance(p)[0] for p in [
        (-37.8420434, -16.021441165, 10.2),
        (-37.8420434, -16.021441165, 10),
    ]]
    fillet(fillet_6_edges, radius=FILLET_6_R - 0.0001)  # a hair under: the kernel refuses the full size

    # 草图58 → 凸台-拉伸22 (add)
    with BuildSketch(Plane.XY.offset(10)):
        with Locations((-31.7920434, -2.021441165)):
            Circle(SKETCH_58_R)
        with Locations((-31.7920434, -2.021441165)):
            Circle(SKETCH_58_R_2, mode=Mode.SUBTRACT)
    extrude(amount=EXTRUDE_22_DEPTH)

    # 圆角9
    fillet_9_edges = [part.edges().sort_by_distance(p)[0] for p in [
        (-37.8420434, -2.021441165, 10.2),
        (-37.8420434, -2.021441165, 10),
    ]]
    fillet(fillet_9_edges, radius=FILLET_9_R - 0.0001)  # a hair under: the kernel refuses the full size

    # 草图61 → 凸台-拉伸23 (add)
    with BuildSketch(Plane.ZY.offset(64.7920434).offset(EXTRUDE_START)):
        with Locations((4, 4.878558835)):
            Circle(SKETCH_61_R)
    extrude(amount=-EXTRUDE_23_DEPTH)

    # 草图62 → 凸台-拉伸24 (add)
    with BuildSketch(Plane.ZY.offset(64.7920434).offset(EXTRUDE_START)):
        with Locations((4, 2.678558835)):
            Circle(SKETCH_62_R)
    extrude(amount=-EXTRUDE_24_DEPTH)

    # 草图65 → 凸台-拉伸28 (add)
    with BuildSketch(Plane.ZY.offset(74.7920434).offset(EXTRUDE_START_4)):
        with Locations((4, 0.478558835)):
            Circle(SKETCH_65_R)
    extrude(amount=EXTRUDE_28_DEPTH)

    # 草图67 → 切除-拉伸26 (cut)
    with BuildSketch(Plane.ZY.offset(74.7920434)):
        with Locations(Location((4, 9.578558835, 0), (0, 0, 270))):
            Circle(SKETCH_67_R)
    extrude(amount=-CUT_EXTRUDE_26_DEPTH, mode=Mode.SUBTRACT)

    # 草图68 → 切除-拉伸27 (cut)
    with BuildSketch(Plane.ZY.offset(74.7920434)):
        with Locations(Location((4, 11.778558835, 0), (0, 0, 270))):
            Circle(SKETCH_68_R)
    extrude(amount=-CUT_EXTRUDE_27_DEPTH, mode=Mode.SUBTRACT)

    # 草图69 → 切除-拉伸28 (cut)
    with BuildSketch(Plane.ZY.offset(74.7920434)):
        with Locations(Location((4, 13.978558835, 0), (0, 0, 270))):
            Circle(SKETCH_69_R)
    extrude(amount=-CUT_EXTRUDE_28_DEPTH, mode=Mode.SUBTRACT)


with BuildPart() as body_2:
    # 草图47 → 凸台-拉伸16 (new body)
    with BuildSketch(Plane.XZ.offset(32.021441165)):
        with Locations(Location((-14.7920434, 4, 0), (0, 0, 270))):
            Circle(SKETCH_47_R)
    extrude(amount=EXTRUDE_16_DEPTH)

    # 草图49 → 切除-拉伸23 (cut)
    with BuildSketch(Plane.XZ.offset(42.021441165).offset(CUT_EXTRUDE_START)):
        with Locations((-14.7920434, 4)):
            Circle(SKETCH_49_R)
    extrude(amount=CUT_EXTRUDE_23_DEPTH, mode=Mode.SUBTRACT)


solid = part.part
